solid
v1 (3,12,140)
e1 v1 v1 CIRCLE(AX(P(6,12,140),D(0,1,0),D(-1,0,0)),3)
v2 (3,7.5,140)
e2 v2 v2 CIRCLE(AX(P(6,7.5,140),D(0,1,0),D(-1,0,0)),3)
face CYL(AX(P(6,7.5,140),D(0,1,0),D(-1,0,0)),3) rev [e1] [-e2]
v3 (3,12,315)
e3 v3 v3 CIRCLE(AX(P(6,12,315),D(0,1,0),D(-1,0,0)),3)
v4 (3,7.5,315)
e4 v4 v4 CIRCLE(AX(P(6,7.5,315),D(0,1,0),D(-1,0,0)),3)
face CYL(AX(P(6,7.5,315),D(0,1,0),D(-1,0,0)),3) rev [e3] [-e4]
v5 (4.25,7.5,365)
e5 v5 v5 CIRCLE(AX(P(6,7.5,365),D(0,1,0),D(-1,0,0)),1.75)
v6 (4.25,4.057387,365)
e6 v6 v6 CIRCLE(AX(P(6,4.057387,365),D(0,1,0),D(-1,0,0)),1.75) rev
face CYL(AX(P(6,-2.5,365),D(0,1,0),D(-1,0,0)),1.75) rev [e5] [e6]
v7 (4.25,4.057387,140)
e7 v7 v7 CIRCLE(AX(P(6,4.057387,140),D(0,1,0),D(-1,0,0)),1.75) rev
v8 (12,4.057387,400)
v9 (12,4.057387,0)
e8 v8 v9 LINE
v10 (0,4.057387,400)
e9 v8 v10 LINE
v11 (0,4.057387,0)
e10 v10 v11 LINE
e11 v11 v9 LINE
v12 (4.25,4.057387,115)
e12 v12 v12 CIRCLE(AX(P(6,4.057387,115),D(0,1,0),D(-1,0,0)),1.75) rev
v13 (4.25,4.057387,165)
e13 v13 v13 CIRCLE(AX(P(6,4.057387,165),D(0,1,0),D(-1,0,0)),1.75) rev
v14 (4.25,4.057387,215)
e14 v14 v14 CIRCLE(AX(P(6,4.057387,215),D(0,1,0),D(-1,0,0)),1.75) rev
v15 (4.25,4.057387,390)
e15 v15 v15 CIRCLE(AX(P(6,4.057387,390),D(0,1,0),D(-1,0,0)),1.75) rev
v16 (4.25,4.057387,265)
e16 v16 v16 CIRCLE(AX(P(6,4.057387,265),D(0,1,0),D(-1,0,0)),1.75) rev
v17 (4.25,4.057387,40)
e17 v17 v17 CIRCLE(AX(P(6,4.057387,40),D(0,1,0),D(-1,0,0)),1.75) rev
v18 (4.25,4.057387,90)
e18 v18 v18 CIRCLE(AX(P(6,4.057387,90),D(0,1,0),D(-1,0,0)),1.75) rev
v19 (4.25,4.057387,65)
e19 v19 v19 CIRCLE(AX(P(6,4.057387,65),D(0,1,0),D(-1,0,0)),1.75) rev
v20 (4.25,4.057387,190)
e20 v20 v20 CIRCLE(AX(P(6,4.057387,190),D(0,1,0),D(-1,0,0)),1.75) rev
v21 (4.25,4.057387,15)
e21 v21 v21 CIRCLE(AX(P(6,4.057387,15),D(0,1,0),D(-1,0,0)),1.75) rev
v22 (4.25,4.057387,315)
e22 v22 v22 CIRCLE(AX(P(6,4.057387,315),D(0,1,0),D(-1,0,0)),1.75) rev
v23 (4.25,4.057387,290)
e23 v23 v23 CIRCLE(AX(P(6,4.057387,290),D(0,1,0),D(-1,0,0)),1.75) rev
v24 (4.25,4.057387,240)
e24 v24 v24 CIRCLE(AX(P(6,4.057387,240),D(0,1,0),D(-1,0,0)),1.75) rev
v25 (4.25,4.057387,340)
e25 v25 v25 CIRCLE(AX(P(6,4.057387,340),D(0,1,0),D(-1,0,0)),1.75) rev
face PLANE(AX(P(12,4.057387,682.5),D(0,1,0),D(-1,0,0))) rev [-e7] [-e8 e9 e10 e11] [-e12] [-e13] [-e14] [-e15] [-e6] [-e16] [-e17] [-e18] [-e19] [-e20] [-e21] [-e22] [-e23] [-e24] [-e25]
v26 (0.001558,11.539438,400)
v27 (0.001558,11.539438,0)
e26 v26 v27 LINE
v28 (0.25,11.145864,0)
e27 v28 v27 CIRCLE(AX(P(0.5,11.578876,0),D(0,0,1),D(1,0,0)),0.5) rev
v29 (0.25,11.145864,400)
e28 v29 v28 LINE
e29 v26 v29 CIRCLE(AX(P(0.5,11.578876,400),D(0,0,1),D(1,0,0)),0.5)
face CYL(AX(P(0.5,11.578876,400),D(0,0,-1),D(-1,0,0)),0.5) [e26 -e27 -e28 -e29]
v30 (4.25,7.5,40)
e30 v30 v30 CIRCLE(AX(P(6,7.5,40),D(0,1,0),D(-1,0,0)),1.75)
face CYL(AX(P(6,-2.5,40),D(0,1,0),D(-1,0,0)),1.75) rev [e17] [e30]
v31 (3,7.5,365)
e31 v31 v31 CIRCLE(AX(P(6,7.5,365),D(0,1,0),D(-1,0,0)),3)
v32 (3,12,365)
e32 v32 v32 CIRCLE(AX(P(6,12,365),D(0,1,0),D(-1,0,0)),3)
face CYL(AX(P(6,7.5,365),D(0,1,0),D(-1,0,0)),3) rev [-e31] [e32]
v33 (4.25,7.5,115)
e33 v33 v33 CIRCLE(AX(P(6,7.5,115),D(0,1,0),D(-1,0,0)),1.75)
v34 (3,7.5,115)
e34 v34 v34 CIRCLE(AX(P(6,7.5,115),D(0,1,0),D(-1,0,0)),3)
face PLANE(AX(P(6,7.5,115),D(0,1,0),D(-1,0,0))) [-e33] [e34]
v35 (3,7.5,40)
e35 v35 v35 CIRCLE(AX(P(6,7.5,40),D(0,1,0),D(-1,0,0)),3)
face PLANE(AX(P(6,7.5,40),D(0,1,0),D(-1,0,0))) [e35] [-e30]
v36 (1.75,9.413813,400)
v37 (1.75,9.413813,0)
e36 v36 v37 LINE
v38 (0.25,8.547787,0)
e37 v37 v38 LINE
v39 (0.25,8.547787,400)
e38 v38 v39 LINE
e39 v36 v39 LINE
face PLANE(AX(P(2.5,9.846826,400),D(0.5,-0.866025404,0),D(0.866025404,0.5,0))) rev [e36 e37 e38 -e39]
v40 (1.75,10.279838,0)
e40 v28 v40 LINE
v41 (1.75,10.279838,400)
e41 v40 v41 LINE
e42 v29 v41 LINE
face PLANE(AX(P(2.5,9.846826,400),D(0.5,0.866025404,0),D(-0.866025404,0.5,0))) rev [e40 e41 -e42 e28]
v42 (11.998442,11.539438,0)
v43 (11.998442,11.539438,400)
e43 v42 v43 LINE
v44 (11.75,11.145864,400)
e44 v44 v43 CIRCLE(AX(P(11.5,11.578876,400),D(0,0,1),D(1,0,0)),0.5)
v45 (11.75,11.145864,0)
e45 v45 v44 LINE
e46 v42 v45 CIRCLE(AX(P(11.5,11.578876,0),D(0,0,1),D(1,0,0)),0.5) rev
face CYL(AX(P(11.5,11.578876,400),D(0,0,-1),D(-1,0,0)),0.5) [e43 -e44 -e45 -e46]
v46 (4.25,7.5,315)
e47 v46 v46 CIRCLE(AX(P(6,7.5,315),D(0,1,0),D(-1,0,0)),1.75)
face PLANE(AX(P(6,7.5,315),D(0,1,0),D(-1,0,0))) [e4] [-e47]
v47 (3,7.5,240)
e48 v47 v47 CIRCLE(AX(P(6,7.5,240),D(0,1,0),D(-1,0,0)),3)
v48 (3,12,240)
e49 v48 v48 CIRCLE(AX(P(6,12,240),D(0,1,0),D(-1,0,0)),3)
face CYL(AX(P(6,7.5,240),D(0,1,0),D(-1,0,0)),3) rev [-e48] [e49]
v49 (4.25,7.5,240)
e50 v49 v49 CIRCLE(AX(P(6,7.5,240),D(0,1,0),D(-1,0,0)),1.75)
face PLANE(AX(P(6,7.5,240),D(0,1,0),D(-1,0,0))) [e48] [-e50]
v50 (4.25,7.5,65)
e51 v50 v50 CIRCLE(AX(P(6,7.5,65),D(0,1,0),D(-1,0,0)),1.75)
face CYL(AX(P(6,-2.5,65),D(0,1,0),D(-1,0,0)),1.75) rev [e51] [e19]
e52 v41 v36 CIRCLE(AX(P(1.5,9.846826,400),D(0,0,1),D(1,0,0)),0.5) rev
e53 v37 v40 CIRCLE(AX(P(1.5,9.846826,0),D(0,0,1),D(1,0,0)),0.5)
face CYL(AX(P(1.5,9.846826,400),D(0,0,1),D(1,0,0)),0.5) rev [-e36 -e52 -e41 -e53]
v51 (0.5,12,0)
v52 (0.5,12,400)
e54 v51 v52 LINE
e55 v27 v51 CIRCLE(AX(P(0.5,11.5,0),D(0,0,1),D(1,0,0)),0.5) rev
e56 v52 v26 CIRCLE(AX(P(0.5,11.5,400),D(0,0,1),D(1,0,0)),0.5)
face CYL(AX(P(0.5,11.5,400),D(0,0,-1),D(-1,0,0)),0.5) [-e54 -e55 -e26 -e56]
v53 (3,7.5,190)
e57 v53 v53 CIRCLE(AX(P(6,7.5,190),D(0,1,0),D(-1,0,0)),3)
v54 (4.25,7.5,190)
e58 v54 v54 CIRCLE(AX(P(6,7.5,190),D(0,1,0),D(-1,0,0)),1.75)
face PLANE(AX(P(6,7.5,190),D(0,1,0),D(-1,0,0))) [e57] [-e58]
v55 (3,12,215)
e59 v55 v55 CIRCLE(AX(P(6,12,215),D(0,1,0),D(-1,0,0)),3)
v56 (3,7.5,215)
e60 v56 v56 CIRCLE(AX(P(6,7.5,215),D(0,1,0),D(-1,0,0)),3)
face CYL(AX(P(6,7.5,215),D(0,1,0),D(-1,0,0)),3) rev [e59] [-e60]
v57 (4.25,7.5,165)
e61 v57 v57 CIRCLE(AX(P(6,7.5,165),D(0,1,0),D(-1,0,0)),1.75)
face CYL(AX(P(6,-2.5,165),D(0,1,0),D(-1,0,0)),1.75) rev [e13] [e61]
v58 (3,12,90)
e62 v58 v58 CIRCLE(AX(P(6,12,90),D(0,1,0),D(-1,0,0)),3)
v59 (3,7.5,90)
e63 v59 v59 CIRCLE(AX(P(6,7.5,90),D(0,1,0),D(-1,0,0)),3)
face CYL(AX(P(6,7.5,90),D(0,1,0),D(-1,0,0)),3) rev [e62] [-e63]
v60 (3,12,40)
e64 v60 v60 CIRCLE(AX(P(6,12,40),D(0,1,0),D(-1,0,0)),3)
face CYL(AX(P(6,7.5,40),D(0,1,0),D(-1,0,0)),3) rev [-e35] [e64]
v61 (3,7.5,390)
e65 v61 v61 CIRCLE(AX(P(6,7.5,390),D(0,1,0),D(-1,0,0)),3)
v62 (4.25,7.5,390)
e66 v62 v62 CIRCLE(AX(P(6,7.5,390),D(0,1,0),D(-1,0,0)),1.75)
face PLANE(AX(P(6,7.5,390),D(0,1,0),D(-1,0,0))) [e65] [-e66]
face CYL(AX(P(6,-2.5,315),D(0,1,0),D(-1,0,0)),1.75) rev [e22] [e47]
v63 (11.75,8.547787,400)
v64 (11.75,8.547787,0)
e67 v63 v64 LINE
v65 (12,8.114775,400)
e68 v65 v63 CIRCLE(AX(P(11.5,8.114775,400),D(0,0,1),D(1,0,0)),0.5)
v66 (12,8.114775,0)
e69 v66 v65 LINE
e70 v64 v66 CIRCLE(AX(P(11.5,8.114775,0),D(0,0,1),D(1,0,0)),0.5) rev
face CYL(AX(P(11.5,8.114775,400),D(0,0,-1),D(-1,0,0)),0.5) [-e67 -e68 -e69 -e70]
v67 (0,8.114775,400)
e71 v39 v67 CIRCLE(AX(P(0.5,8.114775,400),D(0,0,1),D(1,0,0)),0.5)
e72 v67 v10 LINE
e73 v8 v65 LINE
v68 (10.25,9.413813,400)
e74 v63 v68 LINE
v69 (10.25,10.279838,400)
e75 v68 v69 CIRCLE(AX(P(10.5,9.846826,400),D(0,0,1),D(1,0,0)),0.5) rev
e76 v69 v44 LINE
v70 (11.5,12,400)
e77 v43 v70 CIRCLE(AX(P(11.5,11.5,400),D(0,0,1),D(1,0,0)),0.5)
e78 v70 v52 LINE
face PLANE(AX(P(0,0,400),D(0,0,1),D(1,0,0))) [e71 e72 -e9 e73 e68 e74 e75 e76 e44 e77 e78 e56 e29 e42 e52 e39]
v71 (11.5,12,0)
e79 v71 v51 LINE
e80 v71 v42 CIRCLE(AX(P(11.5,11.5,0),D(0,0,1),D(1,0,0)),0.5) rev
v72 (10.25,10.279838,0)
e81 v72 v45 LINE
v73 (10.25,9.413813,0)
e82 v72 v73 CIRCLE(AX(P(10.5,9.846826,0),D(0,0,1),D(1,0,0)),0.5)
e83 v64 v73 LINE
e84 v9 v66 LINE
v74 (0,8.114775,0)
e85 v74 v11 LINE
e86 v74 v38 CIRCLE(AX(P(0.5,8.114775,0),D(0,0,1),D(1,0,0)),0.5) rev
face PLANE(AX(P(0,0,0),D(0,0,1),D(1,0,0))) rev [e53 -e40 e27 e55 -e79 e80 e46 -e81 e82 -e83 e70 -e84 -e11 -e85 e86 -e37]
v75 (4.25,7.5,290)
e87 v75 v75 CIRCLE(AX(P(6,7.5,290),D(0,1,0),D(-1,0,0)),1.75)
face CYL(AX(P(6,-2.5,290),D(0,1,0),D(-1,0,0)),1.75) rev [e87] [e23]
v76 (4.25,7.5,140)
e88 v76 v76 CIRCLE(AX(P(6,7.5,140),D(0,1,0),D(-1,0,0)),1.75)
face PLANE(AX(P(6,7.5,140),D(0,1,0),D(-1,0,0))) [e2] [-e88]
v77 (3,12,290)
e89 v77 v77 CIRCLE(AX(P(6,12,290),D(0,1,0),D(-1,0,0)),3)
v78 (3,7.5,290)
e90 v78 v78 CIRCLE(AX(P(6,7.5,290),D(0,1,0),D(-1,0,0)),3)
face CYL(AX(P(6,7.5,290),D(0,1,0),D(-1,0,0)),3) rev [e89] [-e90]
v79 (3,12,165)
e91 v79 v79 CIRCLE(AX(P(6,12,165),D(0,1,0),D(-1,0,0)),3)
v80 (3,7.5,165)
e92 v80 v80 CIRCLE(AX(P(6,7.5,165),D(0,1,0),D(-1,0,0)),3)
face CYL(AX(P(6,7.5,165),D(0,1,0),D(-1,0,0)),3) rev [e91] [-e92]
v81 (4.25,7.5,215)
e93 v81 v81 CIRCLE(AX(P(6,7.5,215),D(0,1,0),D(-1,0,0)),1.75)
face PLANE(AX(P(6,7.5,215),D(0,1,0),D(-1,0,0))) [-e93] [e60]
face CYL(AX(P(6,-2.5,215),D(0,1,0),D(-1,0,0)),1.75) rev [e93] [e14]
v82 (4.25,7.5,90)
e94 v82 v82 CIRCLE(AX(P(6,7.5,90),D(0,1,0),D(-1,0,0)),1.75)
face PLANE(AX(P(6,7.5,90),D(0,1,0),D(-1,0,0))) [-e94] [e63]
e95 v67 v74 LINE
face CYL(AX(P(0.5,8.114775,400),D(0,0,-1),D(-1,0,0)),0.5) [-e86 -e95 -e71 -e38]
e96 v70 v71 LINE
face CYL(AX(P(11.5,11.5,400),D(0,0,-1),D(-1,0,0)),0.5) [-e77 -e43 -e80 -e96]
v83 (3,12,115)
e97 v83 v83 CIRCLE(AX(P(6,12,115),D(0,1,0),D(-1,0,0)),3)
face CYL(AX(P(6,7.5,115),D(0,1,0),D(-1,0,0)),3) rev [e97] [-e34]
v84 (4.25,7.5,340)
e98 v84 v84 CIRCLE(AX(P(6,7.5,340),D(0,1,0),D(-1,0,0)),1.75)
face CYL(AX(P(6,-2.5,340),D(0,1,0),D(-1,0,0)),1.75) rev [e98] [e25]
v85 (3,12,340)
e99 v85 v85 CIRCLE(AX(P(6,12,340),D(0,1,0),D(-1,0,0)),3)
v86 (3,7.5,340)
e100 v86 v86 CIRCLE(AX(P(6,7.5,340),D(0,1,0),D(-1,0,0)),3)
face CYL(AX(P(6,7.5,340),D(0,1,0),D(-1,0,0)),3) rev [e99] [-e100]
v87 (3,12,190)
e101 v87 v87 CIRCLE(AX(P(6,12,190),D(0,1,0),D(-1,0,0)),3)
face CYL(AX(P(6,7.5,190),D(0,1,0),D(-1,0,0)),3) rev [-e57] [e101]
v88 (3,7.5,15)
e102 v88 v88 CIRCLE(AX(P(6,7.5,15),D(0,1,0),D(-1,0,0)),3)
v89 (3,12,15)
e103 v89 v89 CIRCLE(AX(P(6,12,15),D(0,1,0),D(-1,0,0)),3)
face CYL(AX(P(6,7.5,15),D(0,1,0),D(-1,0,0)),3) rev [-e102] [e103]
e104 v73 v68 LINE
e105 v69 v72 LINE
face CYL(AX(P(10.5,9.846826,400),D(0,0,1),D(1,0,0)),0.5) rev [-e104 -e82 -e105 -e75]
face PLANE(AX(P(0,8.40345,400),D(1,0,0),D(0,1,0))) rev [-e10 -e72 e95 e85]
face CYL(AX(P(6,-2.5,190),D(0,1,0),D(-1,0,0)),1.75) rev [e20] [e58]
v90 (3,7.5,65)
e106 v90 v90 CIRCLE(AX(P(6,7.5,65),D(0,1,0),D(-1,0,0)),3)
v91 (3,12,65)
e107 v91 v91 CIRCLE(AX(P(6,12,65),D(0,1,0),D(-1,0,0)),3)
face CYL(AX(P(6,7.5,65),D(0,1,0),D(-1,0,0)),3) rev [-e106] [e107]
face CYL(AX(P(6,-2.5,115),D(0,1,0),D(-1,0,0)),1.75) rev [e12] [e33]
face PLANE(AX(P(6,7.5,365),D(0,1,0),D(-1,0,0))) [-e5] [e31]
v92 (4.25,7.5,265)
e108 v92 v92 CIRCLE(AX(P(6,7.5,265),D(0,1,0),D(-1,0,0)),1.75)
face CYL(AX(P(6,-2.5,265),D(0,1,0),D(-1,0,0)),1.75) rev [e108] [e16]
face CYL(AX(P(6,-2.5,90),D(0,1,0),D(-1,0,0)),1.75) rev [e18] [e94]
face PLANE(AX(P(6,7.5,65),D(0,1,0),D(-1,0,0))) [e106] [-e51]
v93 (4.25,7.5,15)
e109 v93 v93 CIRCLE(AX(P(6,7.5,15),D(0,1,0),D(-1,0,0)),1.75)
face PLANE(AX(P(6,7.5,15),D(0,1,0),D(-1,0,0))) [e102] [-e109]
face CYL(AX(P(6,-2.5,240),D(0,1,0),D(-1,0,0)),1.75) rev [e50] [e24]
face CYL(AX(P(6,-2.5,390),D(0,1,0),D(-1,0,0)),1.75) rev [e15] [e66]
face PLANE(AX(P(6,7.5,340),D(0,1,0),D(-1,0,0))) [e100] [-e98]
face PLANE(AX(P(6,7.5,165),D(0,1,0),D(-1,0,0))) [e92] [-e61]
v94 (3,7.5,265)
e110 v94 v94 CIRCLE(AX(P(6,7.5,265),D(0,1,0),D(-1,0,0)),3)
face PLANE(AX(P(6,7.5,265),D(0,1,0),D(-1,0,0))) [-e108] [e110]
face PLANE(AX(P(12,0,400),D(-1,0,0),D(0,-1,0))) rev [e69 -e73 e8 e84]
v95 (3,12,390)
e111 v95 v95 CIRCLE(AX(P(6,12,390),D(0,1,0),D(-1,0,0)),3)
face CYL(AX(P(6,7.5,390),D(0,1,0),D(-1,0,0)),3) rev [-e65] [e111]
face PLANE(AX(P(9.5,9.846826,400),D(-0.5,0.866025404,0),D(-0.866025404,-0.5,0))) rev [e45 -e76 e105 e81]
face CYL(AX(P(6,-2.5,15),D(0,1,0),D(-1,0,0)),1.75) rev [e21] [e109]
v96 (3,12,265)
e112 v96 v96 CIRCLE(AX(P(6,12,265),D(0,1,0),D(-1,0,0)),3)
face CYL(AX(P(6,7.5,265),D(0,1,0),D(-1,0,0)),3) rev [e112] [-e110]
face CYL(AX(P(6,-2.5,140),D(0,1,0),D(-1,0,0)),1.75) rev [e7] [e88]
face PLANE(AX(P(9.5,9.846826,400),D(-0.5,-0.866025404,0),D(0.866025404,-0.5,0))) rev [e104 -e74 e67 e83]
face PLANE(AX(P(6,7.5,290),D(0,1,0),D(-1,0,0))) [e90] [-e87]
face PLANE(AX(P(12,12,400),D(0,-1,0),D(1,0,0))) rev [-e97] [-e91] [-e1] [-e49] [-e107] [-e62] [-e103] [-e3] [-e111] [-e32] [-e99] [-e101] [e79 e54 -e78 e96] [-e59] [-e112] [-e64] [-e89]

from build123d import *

# Parameters (mm, degrees)
BOSS_EXTRUDE2_DEPTH = 400
FILLET5_R           = 0.5
SKETCH3_R           = 3
CUT_EXTRUDE2_DEPTH  = 4.5
SKETCH4_R           = 1.75
CUT_EXTRUDE3_DEPTH  = 14.5
SKETCH5_W           = 12
SKETCH5_H           = 4.057387372
CUT_EXTRUDE4_DEPTH  = 682.5


with BuildPart() as part:
    # Sketch1 → Boss-Extrude2 (new body)
    with BuildSketch(Plane.XY):
        Polygon((0, 0), (12, 0), (12, 8.403449878), (9.5, 9.846825551), (12, 11.290201224), (12, 12), (0, 12), (0, 11.290201224), (2.5, 9.846825551), (0, 8.403449878), align=None)
    extrude(amount=BOSS_EXTRUDE2_DEPTH)

    # Fillet5
    # the kernel refuses this fillet: 0.5 mm, written as the material it adds along each edge
    with BuildSketch(Plane(origin=(2.5, 9.846825551, 0), x_dir=(-0.8660254037844382, 0.5000000000000009, 0), z_dir=(0, 0, 1)), Plane(origin=(9.5, 9.846825551, 0), x_dir=(0.8660254037844379, -0.5000000000000013, 0), z_dir=(0, 0, 1))) as fillet5_piece_1:
        with BuildLine():
            CenterArc((FILLET5_R * 1.73205080757, FILLET5_R), FILLET5_R, 150, 120)
            Line((FILLET5_R * 0.866025403784, FILLET5_R * 1.5), (0, 0))
            Line((0, 0), (FILLET5_R * 1.73205080757, 0))
        make_face()
    extrude(amount=400)
    # the kernel refuses this fillet: 0.5 mm, written as the material it takes off along each edge
    with BuildSketch(Plane(origin=(0, 8.403449878, -0.721687836), x_dir=(0, -1, 0), z_dir=(0, 0, 1))) as fillet5_2_piece_1:
        with BuildLine():
            CenterArc((FILLET5_R * 0.57735026919, FILLET5_R), FILLET5_R, 210, 60)
            Line((-FILLET5_R * 0.288675134595, FILLET5_R * 0.5), (0, 0))
            Line((0, 0), (FILLET5_R * 0.57735026919, 0))
        make_face()
    extrude(amount=401.443375673, mode=Mode.SUBTRACT)
    with BuildSketch(Plane(origin=(0, 11.290201224, -0.721687836), x_dir=(0, 1, 0), z_dir=(0, 0, 1)), Plane(origin=(12, 11.290201224, -0.721687836), x_dir=(-0.8660254037844355, -0.5000000000000052, 0), z_dir=(0, 0, 1)), Plane(origin=(12, 8.403449878, -0.721687836), x_dir=(0, -1, 0), z_dir=(0, 0, 1))) as fillet5_2_piece_2:
        with BuildLine():
            CenterArc((FILLET5_R * 0.57735026919, -FILLET5_R), FILLET5_R, 90, 60)
            Line((-FILLET5_R * 0.288675134595, -FILLET5_R * 0.5), (0, 0))
            Line((0, 0), (FILLET5_R * 0.57735026919, 0))
        make_face()
    extrude(amount=401.443375673, mode=Mode.SUBTRACT)
    with BuildSketch(Plane(origin=(0, 12, -1.25), x_dir=(1, 0, 0), z_dir=(0, 0, 1)), Plane(origin=(12, 12, -1.25), x_dir=(0, -1, 0), z_dir=(0, 0, 1))) as fillet5_2_piece_3:
        with BuildLine():
            CenterArc((FILLET5_R, -FILLET5_R), FILLET5_R, 90, 90)
            Line((0, -FILLET5_R), (0, 0))
            Line((0, 0), (FILLET5_R, 0))
        make_face()
    extrude(amount=402.5, mode=Mode.SUBTRACT)

    # Sketch3 → Cut-Extrude2 (cut)
    with BuildSketch(Plane(origin=(0, 12, 0), x_dir=(1, 0, 0), z_dir=(0, 1, 0))):
        with Locations((6, -490)):
            Circle(SKETCH3_R)
        with Locations((6, -440)):
            Circle(SKETCH3_R)
        with Locations((6, -415)):
            Circle(SKETCH3_R)
        with Locations(Location((6, -390, 0), (0, 0, 180))):
            Circle(SKETCH3_R)
        with Locations(Location((6, -365, 0), (0, 0, 180))):
            Circle(SKETCH3_R)
        with Locations(Location((6, -340, 0), (0, 0, 180))):
            Circle(SKETCH3_R)
        with Locations(Location((6, -315, 0), (0, 0, 180))):
            Circle(SKETCH3_R)
        with Locations(Location((6, -290, 0), (0, 0, 180))):
            Circle(SKETCH3_R)
        with Locations(Location((6, -265, 0), (0, 0, 180))):
            Circle(SKETCH3_R)
        with Locations(Location((6, -240, 0), (0, 0, 180))):
            Circle(SKETCH3_R)
        with Locations(Location((6, -215, 0), (0, 0, 180))):
            Circle(SKETCH3_R)
        with Locations(Location((6, -190, 0), (0, 0, 180))):
            Circle(SKETCH3_R)
        with Locations(Location((6, -165, 0), (0, 0, 180))):
            Circle(SKETCH3_R)
        with Locations(Location((6, -140, 0), (0, 0, 180))):
            Circle(SKETCH3_R)
        with Locations(Location((6, -115, 0), (0, 0, 180))):
            Circle(SKETCH3_R)
        with Locations(Location((6, -90, 0), (0, 0, 180))):
            Circle(SKETCH3_R)
        with Locations(Location((6, -65, 0), (0, 0, 180))):
            Circle(SKETCH3_R)
        with Locations(Location((6, -40, 0), (0, 0, 180))):
            Circle(SKETCH3_R)
        with Locations(Location((6, -15, 0), (0, 0, 180))):
            Circle(SKETCH3_R)
        with Locations((6, -465)):
            Circle(SKETCH3_R)
    extrude(amount=-CUT_EXTRUDE2_DEPTH, mode=Mode.SUBTRACT)

    # Sketch4 → Cut-Extrude3 (cut)
    with BuildSketch(Plane(origin=(0, 12, 0), x_dir=(1, 0, 0), z_dir=(0, 1, 0))):
        with Locations(Location((6, -15, 0), (0, 0, 180))):
            Circle(SKETCH4_R)
        with Locations(Location((6, -40, 0), (0, 0, 180))):
            Circle(SKETCH4_R)
        with Locations(Location((6, -65, 0), (0, 0, 180))):
            Circle(SKETCH4_R)
        with Locations(Location((6, -90, 0), (0, 0, 180))):
            Circle(SKETCH4_R)
        with Locations(Location((6, -115, 0), (0, 0, 180))):
            Circle(SKETCH4_R)
        with Locations(Location((6, -140, 0), (0, 0, 180))):
            Circle(SKETCH4_R)
        with Locations(Location((6, -165, 0), (0, 0, 180))):
            Circle(SKETCH4_R)
        with Locations(Location((6, -190, 0), (0, 0, 180))):
            Circle(SKETCH4_R)
        with Locations(Location((6, -215, 0), (0, 0, 180))):
            Circle(SKETCH4_R)
        with Locations(Location((6, -240, 0), (0, 0, 180))):
            Circle(SKETCH4_R)
        with Locations(Location((6, -265, 0), (0, 0, 180))):
            Circle(SKETCH4_R)
        with Locations(Location((6, -290, 0), (0, 0, 180))):
            Circle(SKETCH4_R)
        with Locations(Location((6, -315, 0), (0, 0, 180))):
            Circle(SKETCH4_R)
        with Locations(Location((6, -340, 0), (0, 0, 180))):
            Circle(SKETCH4_R)
        with Locations(Location((6, -365, 0), (0, 0, 180))):
            Circle(SKETCH4_R)
        with Locations(Location((6, -390, 0), (0, 0, 180))):
            Circle(SKETCH4_R)
        with Locations((6, -415)):
            Circle(SKETCH4_R)
        with Locations((6, -440)):
            Circle(SKETCH4_R)
        with Locations((6, -465)):
            Circle(SKETCH4_R)
        with Locations((6, -490)):
            Circle(SKETCH4_R)
    extrude(amount=-CUT_EXTRUDE3_DEPTH, mode=Mode.SUBTRACT)

    # Sketch5 → Cut-Extrude4 (cut)
    with BuildSketch(Plane(origin=(0, 0, 0), x_dir=(-1, 0, 0), z_dir=(0, 0, -1))):
        with Locations((-6, 2.028693686)):
            Rectangle(SKETCH5_W, SKETCH5_H)
    extrude(amount=-CUT_EXTRUDE4_DEPTH, mode=Mode.SUBTRACT)


solid = part.part
